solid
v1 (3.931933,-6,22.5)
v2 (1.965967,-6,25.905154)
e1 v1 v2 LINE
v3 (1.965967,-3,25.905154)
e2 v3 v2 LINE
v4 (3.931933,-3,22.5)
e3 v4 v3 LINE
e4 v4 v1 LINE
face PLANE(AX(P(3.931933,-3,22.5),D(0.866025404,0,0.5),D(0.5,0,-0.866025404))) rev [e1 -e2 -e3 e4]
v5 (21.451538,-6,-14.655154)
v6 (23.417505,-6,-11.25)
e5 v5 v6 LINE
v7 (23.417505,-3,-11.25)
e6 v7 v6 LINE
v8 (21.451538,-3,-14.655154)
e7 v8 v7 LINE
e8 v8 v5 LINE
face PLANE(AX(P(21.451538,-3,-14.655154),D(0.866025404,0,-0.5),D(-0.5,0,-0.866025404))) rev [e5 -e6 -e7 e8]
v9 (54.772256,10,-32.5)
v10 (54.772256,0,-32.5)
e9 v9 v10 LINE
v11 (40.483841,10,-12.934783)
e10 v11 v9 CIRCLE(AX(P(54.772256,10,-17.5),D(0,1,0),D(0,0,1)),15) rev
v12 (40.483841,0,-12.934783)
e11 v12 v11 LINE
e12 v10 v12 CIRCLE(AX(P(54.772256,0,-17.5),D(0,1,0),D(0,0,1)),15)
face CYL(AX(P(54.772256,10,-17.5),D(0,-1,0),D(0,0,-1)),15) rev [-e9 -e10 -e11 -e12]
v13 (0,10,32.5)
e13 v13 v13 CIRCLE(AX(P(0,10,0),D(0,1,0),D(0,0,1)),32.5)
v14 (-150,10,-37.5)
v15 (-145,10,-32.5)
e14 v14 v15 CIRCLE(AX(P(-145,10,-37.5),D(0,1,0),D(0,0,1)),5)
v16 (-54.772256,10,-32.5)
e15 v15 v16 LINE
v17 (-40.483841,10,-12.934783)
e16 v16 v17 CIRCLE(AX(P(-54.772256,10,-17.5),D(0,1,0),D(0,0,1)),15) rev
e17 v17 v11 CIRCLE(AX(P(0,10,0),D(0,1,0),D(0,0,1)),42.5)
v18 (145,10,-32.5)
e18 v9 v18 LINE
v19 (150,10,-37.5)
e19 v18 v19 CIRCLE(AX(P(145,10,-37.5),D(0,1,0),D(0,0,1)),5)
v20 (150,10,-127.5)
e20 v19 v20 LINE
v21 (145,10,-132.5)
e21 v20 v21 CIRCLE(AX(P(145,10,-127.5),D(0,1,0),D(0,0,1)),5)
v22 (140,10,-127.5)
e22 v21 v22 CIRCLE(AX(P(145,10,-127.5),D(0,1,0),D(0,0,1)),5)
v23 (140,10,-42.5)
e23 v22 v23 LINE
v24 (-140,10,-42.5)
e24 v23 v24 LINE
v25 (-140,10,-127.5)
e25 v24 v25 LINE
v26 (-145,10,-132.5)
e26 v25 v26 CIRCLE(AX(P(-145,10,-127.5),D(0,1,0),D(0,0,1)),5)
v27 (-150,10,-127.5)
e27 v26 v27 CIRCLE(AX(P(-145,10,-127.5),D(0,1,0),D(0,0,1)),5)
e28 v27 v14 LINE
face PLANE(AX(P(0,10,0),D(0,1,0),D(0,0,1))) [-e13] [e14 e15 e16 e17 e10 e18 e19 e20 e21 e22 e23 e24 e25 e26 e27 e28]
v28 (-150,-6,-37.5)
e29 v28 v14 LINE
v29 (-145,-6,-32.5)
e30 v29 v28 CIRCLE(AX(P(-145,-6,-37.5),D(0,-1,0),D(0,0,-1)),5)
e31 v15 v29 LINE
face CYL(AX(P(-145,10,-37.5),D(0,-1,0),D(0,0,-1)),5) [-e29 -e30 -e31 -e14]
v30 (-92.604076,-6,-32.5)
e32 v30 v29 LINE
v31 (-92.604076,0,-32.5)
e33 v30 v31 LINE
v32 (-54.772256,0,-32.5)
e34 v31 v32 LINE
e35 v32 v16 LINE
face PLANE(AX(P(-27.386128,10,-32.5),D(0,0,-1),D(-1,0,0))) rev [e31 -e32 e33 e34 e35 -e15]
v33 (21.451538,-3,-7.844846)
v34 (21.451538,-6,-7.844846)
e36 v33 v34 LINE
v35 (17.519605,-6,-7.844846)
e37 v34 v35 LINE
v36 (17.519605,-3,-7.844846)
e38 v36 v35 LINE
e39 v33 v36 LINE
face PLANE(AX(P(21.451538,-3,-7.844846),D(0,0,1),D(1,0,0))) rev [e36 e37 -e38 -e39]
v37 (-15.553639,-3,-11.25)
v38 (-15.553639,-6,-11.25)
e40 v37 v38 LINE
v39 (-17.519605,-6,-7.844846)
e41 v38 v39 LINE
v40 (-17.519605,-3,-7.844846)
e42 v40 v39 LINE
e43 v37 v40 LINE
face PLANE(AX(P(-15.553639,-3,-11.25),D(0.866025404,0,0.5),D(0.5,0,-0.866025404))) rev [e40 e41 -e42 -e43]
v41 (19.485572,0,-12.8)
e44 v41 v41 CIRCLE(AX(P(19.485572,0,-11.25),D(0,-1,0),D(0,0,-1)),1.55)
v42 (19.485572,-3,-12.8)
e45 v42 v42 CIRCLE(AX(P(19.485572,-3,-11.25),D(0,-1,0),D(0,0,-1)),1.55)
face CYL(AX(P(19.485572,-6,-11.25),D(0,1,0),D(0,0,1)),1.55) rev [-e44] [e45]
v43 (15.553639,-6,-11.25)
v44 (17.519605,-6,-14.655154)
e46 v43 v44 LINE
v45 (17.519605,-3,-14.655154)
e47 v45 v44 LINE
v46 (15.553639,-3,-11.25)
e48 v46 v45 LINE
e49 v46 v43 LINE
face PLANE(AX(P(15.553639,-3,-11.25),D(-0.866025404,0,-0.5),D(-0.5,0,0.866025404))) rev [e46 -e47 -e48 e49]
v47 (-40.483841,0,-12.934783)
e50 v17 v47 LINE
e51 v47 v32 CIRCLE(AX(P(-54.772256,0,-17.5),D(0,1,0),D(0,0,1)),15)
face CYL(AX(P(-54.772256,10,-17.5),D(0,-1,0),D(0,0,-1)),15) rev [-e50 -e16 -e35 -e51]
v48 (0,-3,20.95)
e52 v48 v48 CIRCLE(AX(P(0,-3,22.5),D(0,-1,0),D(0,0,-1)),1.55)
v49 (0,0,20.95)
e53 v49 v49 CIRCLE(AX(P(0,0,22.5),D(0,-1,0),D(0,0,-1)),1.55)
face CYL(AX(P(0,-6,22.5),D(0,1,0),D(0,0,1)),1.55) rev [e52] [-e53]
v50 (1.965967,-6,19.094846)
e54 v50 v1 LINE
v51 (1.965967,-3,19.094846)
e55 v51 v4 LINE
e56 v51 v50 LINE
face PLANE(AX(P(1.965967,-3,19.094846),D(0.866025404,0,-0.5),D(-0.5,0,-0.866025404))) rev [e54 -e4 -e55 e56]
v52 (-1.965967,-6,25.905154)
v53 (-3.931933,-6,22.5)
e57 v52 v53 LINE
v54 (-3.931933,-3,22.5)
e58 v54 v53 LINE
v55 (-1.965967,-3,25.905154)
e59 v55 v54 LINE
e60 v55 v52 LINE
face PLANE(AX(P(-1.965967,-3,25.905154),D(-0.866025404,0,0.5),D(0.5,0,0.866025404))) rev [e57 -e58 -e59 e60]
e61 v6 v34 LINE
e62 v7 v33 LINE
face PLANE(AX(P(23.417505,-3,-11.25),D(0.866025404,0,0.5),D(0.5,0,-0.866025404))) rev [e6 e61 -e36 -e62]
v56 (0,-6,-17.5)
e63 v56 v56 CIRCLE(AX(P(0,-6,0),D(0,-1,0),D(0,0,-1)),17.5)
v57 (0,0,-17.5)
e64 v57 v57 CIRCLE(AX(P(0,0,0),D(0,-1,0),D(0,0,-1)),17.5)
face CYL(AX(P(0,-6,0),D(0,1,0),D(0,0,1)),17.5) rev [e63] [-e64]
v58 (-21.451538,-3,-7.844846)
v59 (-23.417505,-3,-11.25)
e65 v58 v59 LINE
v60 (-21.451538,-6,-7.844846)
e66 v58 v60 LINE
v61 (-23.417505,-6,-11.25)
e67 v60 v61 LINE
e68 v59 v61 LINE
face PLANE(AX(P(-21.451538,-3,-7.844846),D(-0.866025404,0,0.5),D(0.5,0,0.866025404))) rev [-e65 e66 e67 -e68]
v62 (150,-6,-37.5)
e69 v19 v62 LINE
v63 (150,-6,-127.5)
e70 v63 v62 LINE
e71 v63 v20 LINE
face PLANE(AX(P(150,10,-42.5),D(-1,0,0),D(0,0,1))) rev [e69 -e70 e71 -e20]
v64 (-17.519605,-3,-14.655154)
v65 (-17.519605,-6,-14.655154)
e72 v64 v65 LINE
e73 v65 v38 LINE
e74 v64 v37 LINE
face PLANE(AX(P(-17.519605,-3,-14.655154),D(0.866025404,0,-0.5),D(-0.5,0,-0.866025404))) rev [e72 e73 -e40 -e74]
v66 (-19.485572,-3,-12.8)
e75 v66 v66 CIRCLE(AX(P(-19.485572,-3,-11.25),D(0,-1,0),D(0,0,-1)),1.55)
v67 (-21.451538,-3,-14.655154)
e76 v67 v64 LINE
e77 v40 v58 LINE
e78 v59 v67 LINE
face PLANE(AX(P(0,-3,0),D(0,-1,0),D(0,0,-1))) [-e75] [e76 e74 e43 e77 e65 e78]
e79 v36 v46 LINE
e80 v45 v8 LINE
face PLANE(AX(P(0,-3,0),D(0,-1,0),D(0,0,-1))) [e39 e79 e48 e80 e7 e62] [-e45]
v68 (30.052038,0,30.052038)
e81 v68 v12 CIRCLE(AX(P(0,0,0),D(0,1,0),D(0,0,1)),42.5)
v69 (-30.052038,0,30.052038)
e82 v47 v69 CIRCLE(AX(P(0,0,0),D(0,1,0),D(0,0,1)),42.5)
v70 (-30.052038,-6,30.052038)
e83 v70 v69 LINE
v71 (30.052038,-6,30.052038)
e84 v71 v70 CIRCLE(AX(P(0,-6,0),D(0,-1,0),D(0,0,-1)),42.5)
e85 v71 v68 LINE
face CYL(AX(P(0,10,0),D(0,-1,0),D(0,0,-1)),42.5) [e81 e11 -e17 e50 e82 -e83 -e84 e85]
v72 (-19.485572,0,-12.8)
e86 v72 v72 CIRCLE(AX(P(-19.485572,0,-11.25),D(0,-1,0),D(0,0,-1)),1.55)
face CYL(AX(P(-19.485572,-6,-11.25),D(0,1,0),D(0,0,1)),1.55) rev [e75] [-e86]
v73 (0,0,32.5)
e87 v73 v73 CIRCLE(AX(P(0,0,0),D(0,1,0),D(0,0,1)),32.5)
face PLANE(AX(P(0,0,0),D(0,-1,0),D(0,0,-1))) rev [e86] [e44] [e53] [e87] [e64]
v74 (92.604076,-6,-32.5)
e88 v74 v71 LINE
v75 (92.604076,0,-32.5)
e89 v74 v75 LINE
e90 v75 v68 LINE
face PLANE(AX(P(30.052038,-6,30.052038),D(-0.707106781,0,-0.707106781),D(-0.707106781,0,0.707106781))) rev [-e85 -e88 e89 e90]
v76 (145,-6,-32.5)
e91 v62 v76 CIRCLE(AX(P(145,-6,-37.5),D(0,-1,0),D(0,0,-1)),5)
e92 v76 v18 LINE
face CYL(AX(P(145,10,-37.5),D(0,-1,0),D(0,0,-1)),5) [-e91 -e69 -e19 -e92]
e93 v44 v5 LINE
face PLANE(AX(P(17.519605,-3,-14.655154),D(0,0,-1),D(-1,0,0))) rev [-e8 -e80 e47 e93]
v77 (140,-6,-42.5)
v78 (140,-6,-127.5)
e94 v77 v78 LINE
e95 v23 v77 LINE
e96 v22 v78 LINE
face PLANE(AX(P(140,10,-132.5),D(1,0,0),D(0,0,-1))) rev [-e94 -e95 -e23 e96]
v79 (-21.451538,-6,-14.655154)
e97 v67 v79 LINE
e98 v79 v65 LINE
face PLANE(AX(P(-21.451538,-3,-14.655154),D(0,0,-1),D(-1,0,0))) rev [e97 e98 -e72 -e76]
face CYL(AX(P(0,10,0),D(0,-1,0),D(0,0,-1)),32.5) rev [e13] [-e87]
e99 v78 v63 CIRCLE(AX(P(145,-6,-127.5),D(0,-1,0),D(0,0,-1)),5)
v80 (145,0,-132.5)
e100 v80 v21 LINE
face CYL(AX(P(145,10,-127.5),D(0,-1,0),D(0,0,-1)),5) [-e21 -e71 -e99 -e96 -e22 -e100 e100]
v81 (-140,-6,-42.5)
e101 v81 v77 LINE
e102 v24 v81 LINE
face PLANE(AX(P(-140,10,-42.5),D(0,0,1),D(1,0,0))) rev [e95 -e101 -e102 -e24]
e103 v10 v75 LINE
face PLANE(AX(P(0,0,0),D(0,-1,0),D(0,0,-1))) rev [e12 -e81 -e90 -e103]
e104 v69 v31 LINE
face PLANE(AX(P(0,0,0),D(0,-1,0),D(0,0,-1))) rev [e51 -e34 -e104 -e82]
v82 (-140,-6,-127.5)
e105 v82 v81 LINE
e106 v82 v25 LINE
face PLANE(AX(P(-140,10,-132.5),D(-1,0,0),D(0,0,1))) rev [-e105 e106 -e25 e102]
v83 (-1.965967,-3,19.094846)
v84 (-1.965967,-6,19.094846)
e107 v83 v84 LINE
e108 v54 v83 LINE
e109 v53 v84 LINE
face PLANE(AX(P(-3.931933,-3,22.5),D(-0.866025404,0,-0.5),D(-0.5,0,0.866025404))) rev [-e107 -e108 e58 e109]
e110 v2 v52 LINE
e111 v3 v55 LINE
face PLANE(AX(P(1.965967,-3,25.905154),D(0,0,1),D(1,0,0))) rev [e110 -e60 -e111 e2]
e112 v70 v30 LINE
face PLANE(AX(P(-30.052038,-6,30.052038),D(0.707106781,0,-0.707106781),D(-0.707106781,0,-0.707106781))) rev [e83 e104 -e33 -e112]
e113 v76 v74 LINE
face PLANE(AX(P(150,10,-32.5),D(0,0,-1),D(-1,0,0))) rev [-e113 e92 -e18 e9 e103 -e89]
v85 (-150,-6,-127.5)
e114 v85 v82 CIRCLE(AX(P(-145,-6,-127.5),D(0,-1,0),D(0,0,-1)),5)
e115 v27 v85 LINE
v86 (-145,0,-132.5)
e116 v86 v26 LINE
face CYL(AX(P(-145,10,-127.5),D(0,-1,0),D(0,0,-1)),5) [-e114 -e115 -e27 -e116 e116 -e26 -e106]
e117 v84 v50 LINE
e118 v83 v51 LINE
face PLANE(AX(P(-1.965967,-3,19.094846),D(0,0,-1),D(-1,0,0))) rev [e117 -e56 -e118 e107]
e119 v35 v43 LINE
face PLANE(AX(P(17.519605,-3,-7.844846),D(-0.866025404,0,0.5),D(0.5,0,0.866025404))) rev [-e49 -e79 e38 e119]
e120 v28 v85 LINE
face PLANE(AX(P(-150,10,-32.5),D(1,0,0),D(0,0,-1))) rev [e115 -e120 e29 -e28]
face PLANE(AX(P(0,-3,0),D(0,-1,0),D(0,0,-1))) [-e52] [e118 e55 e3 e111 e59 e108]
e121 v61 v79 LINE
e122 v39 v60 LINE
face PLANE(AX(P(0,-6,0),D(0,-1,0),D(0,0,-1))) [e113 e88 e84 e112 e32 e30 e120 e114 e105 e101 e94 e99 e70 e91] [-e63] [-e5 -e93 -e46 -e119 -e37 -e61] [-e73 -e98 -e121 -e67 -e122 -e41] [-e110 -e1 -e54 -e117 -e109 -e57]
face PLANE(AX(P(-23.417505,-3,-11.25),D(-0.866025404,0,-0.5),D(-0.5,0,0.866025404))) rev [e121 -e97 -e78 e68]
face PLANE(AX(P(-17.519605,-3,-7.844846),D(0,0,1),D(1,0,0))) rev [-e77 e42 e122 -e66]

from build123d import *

# Parameters (mm, degrees)
SKETCH1_R           = 32.5
BOSS_EXTRUDE1_DEPTH = 10
FILLET1_R           = 5
FILLET2_R           = 15
BOSS_EXTRUDE2_START = 6
SKETCH2_R           = 1.55
SKETCH2_R_2         = 17.5
BOSS_EXTRUDE2_DEPTH = 6
CUT_EXTRUDE1_DEPTH  = 3


with BuildPart() as part:
    # Sketch1 → Boss-Extrude1 (new body)
    with BuildSketch(Plane(origin=(0, 0, 0), x_dir=(1, 0, 0), z_dir=(0, 1, 0))):
        with BuildLine():
            Line((0, 42.5), (140, 42.5))
            Line((140, 42.5), (140, 132.5))
            Line((140, 132.5), (150, 132.5))
            Line((150, 132.5), (150, 42.5))
            Line((150, 42.5), (150, 32.5))
            Line((150, 32.5), (27.386127875, 32.5))
            ThreePointArc((27.386127875, 32.5), (0, -42.5), (-27.386127875, 32.5))
            Line((-27.386127875, 32.5), (-150, 32.5))
            Line((-150, 32.5), (-150, 42.5))
            Line((-150, 42.5), (-150, 132.5))
            Line((-150, 132.5), (-140, 132.5))
            Line((-140, 132.5), (-140, 42.5))
            Line((-140, 42.5), (0, 42.5))
        make_face()
        with Locations(Location((0, 0, 0), (0, 0, 270))):
            Circle(SKETCH1_R, mode=Mode.SUBTRACT)
    extrude(amount=BOSS_EXTRUDE1_DEPTH)

    # Fillet1
    fillet1_edges = [part.edges().sort_by_distance(p)[0] for p in [
        (150, 5, -132.5),
        (140, 5, -132.5),
        (150, 5, -32.5),
        (-150, 5, -32.5),
        (-140, 5, -132.5),
        (-150, 5, -132.5),
    ]]
    fillet(fillet1_edges, radius=FILLET1_R - 0.0001)  # a hair under: the kernel refuses the full size

    # Fillet2
    fillet2_edges = [part.edges().sort_by_distance(p)[0] for p in [
        (27.386127875, 5, -32.5),
        (-27.386127875, 5, -32.5),
    ]]
    fillet(fillet2_edges, radius=FILLET2_R)

    # Sketch2 → Boss-Extrude2 (add)
    with BuildSketch(Plane.XZ.offset(BOSS_EXTRUDE2_START)):
        with BuildLine():
            Line((-30.0520382, 30.0520382), (-92.604076401, -32.5))
            Line((-92.604076401, -32.5), (-145, -32.5))
            ThreePointArc((-145, -32.5), (-148.535533906, -33.964466094), (-150, -37.5))
            Line((-150, -37.5), (-150, -127.5))
            ThreePointArc((-150, -127.5), (-148.535533906, -131.035533906), (-145, -132.5))
            ThreePointArc((-145, -132.5), (-141.464466094, -131.035533906), (-140, -127.5))
            Line((-140, -127.5), (-140, -42.5))
            Line((-140, -42.5), (140, -42.5))
            Line((140, -42.5), (140, -127.5))
            ThreePointArc((140, -127.5), (141.464466094, -131.035533906), (145, -132.5))
            ThreePointArc((145, -132.5), (148.535533906, -131.035533906), (150, -127.5))
            Line((150, -127.5), (150, -37.5))
            ThreePointArc((150, -37.5), (148.535533906, -33.964466094), (145, -32.5))
            Line((145, -32.5), (92.604076401, -32.5))
            Line((92.604076401, -32.5), (30.0520382, 30.0520382))
            ThreePointArc((30.0520382, 30.0520382), (0, 42.5), (-30.0520382, 30.0520382))
        make_face()
        with Locations(Location((0, 22.5, 0), (0, 0, 270))):
            Circle(SKETCH2_R, mode=Mode.SUBTRACT)
        with Locations(Location((19.485571585, -11.25, 0), (0, 0, 270))):
            Circle(SKETCH2_R, mode=Mode.SUBTRACT)
        with Locations(Location((-19.485571585, -11.25, 0), (0, 0, 270))):
            Circle(SKETCH2_R, mode=Mode.SUBTRACT)
        with Locations(Location((0, 0, 0), (0, 0, 270))):
            Circle(SKETCH2_R_2, mode=Mode.SUBTRACT)
    extrude(amount=-BOSS_EXTRUDE2_DEPTH)

    # Sketch4 → Cut-Extrude1 (cut)
    with BuildSketch(Plane.XZ.offset(6)):
        Polygon((17.519605061, -14.655153906), (21.451538109, -14.655153906), (23.417504634, -11.25), (21.451538109, -7.844846094), (17.519605061, -7.844846094), (15.553638537, -11.25), align=None)
        Polygon((3.931933048, 22.5), (1.965966524, 25.905153906), (-1.965966524, 25.905153906), (-3.931933048, 22.5), (-1.965966524, 19.094846094), (1.965966524, 19.094846094), align=None)
        Polygon((-21.451538109, -7.844846094), (-23.417504634, -11.25), (-21.451538109, -14.655153906), (-17.519605061, -14.655153906), (-15.553638537, -11.25), (-17.519605061, -7.844846094), align=None)
    extrude(amount=-CUT_EXTRUDE1_DEPTH, mode=Mode.SUBTRACT)


solid = part.part
